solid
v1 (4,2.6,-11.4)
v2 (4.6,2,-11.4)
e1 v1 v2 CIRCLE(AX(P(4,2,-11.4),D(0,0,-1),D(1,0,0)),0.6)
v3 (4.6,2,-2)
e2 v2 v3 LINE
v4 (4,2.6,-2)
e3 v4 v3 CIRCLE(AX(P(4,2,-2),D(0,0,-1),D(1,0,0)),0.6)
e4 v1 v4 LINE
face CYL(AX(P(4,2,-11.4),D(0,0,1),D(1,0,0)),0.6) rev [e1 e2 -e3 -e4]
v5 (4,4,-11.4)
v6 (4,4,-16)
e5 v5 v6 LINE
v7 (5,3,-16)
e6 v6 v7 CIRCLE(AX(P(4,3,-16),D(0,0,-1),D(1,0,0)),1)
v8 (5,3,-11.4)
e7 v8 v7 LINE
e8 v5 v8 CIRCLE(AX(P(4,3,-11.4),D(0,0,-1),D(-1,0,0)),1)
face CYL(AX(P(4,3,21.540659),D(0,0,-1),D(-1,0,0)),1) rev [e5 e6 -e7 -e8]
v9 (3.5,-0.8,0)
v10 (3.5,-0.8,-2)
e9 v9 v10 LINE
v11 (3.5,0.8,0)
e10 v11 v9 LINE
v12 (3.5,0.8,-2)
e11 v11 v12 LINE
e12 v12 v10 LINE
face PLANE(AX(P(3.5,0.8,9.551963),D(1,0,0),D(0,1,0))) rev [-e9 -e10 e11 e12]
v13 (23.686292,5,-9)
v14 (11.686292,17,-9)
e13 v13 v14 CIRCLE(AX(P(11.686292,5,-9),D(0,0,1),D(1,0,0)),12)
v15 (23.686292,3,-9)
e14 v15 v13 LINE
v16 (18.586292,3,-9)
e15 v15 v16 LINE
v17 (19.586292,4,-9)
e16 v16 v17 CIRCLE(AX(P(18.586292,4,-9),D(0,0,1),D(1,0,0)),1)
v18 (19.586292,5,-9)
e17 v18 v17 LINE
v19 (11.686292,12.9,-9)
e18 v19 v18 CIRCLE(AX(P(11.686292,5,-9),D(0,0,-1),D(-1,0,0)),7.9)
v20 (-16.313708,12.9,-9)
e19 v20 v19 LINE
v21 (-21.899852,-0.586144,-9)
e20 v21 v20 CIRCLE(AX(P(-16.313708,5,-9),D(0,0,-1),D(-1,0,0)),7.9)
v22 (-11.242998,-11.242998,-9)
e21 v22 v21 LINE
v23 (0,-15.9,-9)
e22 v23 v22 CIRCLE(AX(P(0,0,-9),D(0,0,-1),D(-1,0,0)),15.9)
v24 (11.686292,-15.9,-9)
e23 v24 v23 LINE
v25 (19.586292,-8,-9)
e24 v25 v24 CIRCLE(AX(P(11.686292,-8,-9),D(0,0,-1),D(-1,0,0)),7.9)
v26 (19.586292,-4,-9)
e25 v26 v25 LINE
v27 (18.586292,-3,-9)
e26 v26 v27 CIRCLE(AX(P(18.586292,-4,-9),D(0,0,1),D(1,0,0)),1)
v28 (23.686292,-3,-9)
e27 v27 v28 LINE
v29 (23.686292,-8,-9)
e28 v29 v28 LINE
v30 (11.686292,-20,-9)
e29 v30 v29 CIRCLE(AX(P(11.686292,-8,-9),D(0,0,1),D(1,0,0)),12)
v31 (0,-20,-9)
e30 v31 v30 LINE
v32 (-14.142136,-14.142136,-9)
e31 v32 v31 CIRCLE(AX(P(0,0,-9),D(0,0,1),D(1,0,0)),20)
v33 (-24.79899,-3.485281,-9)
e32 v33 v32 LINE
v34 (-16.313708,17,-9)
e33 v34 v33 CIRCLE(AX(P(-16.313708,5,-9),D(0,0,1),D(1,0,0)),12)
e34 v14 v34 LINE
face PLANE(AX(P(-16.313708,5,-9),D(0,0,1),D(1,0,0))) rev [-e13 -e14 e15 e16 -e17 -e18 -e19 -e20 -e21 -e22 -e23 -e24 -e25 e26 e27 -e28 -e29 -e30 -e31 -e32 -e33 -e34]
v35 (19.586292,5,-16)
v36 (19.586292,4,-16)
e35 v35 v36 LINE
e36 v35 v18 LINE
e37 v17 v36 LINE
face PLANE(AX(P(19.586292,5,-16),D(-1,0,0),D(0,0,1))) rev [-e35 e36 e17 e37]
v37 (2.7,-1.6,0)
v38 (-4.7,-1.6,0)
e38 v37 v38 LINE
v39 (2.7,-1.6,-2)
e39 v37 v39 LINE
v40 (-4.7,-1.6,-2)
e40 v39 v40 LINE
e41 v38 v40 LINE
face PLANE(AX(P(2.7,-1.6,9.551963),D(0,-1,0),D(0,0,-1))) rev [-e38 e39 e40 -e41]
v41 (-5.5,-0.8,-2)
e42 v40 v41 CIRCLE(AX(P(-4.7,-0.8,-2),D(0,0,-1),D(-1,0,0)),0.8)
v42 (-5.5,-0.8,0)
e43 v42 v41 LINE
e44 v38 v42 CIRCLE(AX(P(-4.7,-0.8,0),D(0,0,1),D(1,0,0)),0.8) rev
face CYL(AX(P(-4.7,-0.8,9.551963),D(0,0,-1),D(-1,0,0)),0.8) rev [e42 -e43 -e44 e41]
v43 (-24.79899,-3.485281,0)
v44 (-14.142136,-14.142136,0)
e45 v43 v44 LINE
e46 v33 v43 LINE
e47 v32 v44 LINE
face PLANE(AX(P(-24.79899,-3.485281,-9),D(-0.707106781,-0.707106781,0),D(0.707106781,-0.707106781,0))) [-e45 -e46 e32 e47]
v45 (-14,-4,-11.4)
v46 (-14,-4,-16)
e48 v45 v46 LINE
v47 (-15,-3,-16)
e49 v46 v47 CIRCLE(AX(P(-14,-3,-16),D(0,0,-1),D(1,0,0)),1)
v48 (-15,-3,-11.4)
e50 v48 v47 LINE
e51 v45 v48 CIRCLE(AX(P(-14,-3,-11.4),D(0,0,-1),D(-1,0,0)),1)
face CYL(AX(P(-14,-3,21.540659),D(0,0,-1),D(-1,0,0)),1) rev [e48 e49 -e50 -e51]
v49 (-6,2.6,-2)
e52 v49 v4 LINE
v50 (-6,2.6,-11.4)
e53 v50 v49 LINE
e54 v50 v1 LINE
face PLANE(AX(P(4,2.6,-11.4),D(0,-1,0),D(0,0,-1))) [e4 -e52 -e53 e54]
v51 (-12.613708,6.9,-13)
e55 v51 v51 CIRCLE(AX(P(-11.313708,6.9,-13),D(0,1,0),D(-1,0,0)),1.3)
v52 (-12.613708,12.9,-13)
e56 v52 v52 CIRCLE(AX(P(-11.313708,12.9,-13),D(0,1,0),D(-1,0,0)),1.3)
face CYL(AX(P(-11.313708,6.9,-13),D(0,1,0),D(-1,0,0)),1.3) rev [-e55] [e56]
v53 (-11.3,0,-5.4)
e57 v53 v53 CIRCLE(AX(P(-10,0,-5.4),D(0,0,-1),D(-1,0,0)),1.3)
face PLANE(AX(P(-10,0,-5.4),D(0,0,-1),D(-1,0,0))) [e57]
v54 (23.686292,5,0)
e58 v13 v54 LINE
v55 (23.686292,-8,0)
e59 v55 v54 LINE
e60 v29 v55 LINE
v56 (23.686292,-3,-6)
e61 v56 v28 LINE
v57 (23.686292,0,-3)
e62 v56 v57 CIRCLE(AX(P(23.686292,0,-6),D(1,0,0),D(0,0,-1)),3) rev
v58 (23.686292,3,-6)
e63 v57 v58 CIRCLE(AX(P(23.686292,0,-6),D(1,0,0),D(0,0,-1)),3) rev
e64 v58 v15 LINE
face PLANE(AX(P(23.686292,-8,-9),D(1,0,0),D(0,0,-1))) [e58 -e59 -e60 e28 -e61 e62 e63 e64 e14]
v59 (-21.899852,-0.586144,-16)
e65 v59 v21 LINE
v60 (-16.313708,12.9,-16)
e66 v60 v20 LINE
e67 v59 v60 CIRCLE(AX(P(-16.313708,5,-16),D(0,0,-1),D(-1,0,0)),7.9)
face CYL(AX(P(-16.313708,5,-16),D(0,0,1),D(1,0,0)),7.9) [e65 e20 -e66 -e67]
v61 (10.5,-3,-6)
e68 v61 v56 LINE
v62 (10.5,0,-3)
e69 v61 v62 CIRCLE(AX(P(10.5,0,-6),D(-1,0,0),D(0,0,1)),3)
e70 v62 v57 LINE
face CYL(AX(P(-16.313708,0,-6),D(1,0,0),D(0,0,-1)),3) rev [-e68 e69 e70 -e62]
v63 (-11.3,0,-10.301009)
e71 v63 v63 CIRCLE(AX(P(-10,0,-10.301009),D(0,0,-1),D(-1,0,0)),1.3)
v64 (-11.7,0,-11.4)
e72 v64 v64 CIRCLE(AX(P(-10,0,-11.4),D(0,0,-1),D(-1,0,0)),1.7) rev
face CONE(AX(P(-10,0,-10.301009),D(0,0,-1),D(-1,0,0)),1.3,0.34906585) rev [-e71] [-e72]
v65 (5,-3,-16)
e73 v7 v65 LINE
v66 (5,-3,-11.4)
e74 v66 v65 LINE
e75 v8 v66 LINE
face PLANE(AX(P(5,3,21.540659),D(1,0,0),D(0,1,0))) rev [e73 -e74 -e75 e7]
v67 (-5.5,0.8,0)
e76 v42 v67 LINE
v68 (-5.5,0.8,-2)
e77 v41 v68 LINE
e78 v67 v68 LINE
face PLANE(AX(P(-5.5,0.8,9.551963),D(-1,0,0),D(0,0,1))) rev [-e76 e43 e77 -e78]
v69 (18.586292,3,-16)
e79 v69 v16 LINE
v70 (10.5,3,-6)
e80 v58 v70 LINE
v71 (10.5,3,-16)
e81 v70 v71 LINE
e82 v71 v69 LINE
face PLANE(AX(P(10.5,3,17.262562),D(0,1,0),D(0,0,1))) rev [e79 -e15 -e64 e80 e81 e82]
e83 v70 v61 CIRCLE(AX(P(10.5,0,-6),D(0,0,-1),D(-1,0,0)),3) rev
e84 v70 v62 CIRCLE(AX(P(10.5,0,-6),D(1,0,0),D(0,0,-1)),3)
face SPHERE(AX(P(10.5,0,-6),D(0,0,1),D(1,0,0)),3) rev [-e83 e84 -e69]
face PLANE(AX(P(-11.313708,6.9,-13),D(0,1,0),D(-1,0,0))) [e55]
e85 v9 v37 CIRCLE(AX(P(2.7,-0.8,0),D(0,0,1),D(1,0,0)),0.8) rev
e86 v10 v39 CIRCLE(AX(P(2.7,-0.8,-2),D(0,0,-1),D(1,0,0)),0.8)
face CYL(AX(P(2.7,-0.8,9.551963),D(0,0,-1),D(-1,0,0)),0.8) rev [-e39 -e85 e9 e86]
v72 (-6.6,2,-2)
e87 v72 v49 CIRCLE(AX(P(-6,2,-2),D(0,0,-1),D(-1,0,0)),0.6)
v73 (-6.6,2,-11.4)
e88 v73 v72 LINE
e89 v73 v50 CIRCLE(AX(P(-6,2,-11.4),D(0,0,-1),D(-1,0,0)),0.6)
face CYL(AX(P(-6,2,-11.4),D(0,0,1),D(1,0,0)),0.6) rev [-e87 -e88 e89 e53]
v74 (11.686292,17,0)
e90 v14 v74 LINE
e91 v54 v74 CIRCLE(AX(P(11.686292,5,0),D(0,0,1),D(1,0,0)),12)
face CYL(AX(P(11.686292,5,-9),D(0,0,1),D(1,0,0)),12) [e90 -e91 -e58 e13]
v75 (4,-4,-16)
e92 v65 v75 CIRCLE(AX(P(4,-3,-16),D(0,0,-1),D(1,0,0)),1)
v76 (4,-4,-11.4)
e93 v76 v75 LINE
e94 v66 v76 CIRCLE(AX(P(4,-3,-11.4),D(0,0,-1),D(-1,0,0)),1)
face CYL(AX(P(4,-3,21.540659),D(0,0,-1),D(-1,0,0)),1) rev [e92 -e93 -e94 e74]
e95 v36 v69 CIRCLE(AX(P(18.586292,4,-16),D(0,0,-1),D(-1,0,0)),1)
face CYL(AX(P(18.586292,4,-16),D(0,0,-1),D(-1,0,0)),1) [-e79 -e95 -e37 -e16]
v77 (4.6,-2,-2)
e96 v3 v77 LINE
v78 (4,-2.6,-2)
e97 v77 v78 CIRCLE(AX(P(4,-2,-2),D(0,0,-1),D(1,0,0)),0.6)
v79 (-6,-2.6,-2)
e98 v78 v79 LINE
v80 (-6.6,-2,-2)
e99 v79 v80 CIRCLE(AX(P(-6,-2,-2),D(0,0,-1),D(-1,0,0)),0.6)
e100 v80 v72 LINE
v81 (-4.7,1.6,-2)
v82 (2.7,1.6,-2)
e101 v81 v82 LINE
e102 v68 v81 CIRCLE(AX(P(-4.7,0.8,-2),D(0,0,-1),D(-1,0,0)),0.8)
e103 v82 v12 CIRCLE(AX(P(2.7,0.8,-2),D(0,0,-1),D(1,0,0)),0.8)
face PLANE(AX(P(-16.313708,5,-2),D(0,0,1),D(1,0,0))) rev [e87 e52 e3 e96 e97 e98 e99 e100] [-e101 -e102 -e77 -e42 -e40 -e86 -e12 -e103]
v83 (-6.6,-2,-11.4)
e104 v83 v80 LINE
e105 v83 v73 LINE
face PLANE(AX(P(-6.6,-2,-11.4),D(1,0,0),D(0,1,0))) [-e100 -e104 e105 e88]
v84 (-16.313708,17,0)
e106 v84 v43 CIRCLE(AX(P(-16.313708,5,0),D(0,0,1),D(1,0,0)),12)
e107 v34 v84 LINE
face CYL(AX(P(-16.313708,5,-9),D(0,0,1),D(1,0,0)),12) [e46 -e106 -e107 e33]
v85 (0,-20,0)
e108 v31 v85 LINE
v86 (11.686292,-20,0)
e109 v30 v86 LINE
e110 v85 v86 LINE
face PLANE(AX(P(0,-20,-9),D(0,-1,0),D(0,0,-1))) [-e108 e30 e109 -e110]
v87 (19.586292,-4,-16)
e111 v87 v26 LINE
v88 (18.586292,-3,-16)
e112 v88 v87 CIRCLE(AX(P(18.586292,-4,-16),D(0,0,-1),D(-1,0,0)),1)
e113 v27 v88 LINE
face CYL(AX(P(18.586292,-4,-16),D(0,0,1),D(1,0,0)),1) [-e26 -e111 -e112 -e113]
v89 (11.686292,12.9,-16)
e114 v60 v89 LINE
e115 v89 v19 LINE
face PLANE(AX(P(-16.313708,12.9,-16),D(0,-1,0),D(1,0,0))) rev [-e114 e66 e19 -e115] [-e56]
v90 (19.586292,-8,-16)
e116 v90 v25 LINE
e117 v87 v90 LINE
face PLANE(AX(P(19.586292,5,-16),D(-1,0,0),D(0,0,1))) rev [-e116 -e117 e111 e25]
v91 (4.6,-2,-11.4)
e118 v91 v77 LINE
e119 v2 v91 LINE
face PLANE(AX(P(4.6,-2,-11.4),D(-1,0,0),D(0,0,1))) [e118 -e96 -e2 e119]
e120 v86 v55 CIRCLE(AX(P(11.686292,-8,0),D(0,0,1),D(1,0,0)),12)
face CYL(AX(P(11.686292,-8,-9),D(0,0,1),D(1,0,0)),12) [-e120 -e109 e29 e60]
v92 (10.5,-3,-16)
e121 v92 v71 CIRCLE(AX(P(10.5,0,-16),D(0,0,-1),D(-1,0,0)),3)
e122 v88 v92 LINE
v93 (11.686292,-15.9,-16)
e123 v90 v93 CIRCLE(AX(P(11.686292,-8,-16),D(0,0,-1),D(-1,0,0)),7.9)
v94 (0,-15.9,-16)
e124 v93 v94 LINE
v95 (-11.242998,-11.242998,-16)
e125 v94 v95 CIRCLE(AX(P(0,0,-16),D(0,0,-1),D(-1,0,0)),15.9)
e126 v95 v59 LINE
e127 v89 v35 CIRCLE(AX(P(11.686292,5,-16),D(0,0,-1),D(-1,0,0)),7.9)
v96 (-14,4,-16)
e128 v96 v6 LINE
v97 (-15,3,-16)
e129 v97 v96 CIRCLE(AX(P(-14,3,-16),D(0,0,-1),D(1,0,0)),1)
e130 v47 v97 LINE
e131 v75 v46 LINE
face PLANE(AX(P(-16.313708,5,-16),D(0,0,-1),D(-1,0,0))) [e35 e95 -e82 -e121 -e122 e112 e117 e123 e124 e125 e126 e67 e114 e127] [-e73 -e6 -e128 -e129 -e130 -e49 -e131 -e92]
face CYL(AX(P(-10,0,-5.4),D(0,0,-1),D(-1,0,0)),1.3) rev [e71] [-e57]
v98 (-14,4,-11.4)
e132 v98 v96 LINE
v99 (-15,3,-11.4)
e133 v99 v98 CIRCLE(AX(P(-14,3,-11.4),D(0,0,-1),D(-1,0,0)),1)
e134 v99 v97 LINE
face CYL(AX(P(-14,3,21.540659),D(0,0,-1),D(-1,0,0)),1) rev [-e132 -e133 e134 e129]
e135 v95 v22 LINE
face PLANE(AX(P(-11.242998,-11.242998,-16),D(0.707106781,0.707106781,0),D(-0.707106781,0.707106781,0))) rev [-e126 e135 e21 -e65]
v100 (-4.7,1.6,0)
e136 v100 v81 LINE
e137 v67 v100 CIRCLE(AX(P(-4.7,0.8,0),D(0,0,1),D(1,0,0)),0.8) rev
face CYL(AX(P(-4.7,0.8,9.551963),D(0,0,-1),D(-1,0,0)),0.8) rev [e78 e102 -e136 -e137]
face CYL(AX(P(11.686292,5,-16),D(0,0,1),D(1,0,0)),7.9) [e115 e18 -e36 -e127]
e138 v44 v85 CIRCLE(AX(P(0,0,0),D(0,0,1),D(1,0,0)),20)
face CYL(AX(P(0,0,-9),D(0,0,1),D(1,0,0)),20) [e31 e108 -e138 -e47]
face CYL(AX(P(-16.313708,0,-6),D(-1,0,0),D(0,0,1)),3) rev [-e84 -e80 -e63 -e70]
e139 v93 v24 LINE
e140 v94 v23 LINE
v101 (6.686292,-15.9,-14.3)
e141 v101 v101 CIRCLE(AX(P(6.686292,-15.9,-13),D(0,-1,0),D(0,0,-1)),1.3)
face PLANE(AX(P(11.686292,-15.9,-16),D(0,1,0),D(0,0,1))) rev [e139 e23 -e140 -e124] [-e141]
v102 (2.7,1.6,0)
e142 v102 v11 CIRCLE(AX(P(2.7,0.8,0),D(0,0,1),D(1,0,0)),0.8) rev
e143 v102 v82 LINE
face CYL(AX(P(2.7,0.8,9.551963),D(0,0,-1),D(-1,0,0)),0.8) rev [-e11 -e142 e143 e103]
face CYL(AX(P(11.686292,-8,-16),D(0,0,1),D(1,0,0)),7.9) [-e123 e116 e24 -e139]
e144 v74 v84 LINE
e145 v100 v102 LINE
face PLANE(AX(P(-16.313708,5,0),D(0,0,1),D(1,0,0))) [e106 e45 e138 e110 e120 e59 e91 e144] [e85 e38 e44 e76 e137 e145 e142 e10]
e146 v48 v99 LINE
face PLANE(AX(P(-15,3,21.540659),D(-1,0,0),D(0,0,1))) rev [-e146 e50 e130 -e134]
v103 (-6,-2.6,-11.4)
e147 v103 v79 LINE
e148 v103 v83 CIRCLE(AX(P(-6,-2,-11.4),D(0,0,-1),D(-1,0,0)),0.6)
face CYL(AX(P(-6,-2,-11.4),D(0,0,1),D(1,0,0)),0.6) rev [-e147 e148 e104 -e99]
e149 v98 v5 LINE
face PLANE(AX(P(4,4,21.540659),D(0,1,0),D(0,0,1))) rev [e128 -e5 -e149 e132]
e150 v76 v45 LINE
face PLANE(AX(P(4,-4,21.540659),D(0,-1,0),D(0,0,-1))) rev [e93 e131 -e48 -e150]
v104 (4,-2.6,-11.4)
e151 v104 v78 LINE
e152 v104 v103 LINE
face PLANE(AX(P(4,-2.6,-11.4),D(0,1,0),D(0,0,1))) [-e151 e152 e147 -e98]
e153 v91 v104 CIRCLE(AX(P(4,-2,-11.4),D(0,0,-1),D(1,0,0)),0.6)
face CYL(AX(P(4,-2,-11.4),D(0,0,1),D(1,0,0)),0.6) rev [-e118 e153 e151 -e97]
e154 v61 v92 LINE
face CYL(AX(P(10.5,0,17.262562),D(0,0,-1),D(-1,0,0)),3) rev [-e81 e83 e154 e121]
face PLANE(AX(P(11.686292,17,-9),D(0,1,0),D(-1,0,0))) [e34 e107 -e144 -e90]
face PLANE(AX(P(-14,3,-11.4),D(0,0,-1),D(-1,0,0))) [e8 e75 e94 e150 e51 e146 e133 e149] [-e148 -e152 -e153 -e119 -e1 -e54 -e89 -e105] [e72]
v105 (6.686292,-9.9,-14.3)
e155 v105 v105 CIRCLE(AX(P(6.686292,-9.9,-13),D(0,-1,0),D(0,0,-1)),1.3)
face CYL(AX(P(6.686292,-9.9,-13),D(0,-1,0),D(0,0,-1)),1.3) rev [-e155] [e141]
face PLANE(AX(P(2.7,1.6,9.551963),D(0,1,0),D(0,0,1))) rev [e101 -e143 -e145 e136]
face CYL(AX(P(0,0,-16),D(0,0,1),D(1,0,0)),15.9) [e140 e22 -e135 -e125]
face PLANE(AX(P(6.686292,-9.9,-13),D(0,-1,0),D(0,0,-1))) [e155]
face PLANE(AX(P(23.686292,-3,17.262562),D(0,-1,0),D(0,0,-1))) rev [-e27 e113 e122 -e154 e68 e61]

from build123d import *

# Parameters (mm, degrees)
EXTRUDE_1_DEPTH     = 9
EXTRUDE_2_DEPTH     = 7
SKETCH_6_R          = 1.3
CUT_EXTRUDE_1_DEPTH = 6
SKETCH_7_R          = 1.3
CUT_EXTRUDE_2_DEPTH = 6
CUT_EXTRUDE_3_DEPTH = 14
CUT_EXTRUDE_4_DEPTH = 2
EXTRUDE_START       = 9.4
EXTRUDE_4_DEPTH     = 9.4
SKETCH_11_R         = 1.3
CUT_EXTRUDE_5_DEPTH = 6
CHAMFER_1_SIZE      = 0.4
CHAMFER_1_SIZE2     = 1.098990968
CUT_EXTRUDE_6_DEPTH = 13
FILLET_1_R          = 3
FILLET_2_R          = 1


with BuildPart() as part:
    # 草图2 → 凸台-拉伸1 (new body)
    with BuildSketch(Plane.XY):
        with BuildLine():
            Line((-24.798989873, -3.485281374), (-14.142135624, -14.142135624))
            ThreePointArc((-14.142135624, -14.142135624), (-7.653668647, -18.47759065), (0, -20))
            Line((0, -20), (11.686291501, -20))
            ThreePointArc((11.686291501, -20), (20.171572875, -16.485281374), (23.686291501, -8))
            Line((23.686291501, -8), (23.686291501, 5))
            ThreePointArc((23.686291501, 5), (20.171572875, 13.485281374), (11.686291501, 17))
            Line((11.686291501, 17), (-16.313708499, 17))
            ThreePointArc((-16.313708499, 17), (-27.400262889, 9.592201188), (-24.798989873, -3.485281374))
        make_face()
    extrude(amount=-EXTRUDE_1_DEPTH)

    # 草图3 → 凸台-拉伸2 (add)
    with BuildSketch(Plane(origin=(0, 0, -9), x_dir=(-1, 0, 0), z_dir=(0, 0, -1))):
        with BuildLine():
            Line((16.313708499, 12.9), (-11.686291501, 12.9))
            ThreePointArc((-11.686291501, 12.9), (-17.272435072, 10.586143571), (-19.586291501, 5))
            Line((-19.586291501, 5), (-19.586291501, -8))
            ThreePointArc((-19.586291501, -8), (-17.272435072, -13.586143571), (-11.686291501, -15.9))
            Line((-11.686291501, -15.9), (0, -15.9))
            ThreePointArc((0, -15.9), (6.084666575, -14.689684567), (11.242997821, -11.242997821))
            Line((11.242997821, -11.242997821), (21.89985207, -0.586143571))
            ThreePointArc((21.89985207, -0.586143571), (23.612356806, 8.023199116), (16.313708499, 12.9))
        make_face()
    extrude(amount=EXTRUDE_2_DEPTH)

    # 草图6 → 切除-拉伸1 (cut)
    with BuildSketch(Plane(origin=(0, 12.9, 0), x_dir=(1, 0, 0), z_dir=(0, 1, 0))):
        with Locations(Location((-11.313708499, 13, 0), (0, 0, 180))):
            Circle(SKETCH_6_R)
    extrude(amount=-CUT_EXTRUDE_1_DEPTH, mode=Mode.SUBTRACT)

    # 草图7 → 切除-拉伸2 (cut)
    with BuildSketch(Plane.XZ.offset(15.9)):
        with Locations(Location((6.686291501, -13, 0), (0, 0, 270))):
            Circle(SKETCH_7_R)
    extrude(amount=-CUT_EXTRUDE_2_DEPTH, mode=Mode.SUBTRACT)

    # 草图8 → 切除-拉伸3 (cut)
    with BuildSketch(Plane(origin=(0, 0, -16), x_dir=(-1, 0, 0), z_dir=(0, 0, -1))):
        with BuildLine():
            Line((-4, 4), (14, 4))
            ThreePointArc((14, 4), (14.707106781, 3.707106781), (15, 3))
            Line((15, 3), (15, -3))
            ThreePointArc((15, -3), (14.707106781, -3.707106781), (14, -4))
            Line((14, -4), (-4, -4))
            ThreePointArc((-4, -4), (-4.707106781, -3.707106781), (-5, -3))
            Line((-5, -3), (-5, 3))
            ThreePointArc((-5, 3), (-4.707106781, 3.707106781), (-4, 4))
        make_face()
    extrude(amount=-CUT_EXTRUDE_3_DEPTH, mode=Mode.SUBTRACT)

    # 草图9 → 切除-拉伸4 (cut)
    with BuildSketch(Plane(origin=(0, 0, -2), x_dir=(-1, 0, 0), z_dir=(0, 0, -1))):
        with BuildLine():
            Line((-2.7, 1.6), (4.7, 1.6))
            ThreePointArc((4.7, 1.6), (5.265685425, 1.365685425), (5.5, 0.8))
            Line((5.5, 0.8), (5.5, -0.8))
            ThreePointArc((5.5, -0.8), (5.265685425, -1.365685425), (4.7, -1.6))
            Line((4.7, -1.6), (-2.7, -1.6))
            ThreePointArc((-2.7, -1.6), (-3.265685425, -1.365685425), (-3.5, -0.8))
            Line((-3.5, -0.8), (-3.5, 0.8))
            ThreePointArc((-3.5, 0.8), (-3.265685425, 1.365685425), (-2.7, 1.6))
        make_face()
    extrude(amount=-CUT_EXTRUDE_4_DEPTH, mode=Mode.SUBTRACT)

    # 草图10 → 凸台-拉伸4 (add)
    with BuildSketch(Plane(origin=(0, 0, -2), x_dir=(-1, 0, 0), z_dir=(0, 0, -1)).offset(EXTRUDE_START)):
        with BuildLine():
            Line((14, 4), (-4, 4))
            ThreePointArc((-4, 4), (-4.707106781, 3.707106781), (-5, 3))
            Line((-5, 3), (-5, -3))
            ThreePointArc((-5, -3), (-4.707106781, -3.707106781), (-4, -4))
            Line((-4, -4), (14, -4))
            ThreePointArc((14, -4), (14.707106781, -3.707106781), (15, -3))
            Line((15, -3), (15, 3))
            ThreePointArc((15, 3), (14.707106781, 3.707106781), (14, 4))
        make_face()
        with BuildLine():
            Line((-4, -2.6), (6, -2.6))
            ThreePointArc((6, -2.6), (6.424264069, -2.424264069), (6.6, -2))
            Line((6.6, -2), (6.6, 2))
            ThreePointArc((6.6, 2), (6.424264069, 2.424264069), (6, 2.6))
            Line((6, 2.6), (-4, 2.6))
            ThreePointArc((-4, 2.6), (-4.424264069, 2.424264069), (-4.6, 2))
            Line((-4.6, 2), (-4.6, -2))
            ThreePointArc((-4.6, -2), (-4.424264069, -2.424264069), (-4, -2.6))
        make_face(mode=Mode.SUBTRACT)
    extrude(amount=-EXTRUDE_4_DEPTH)

    # 草图11 → 切除-拉伸5 (cut)
    with BuildSketch(Plane(origin=(0, 0, -11.4), x_dir=(-1, 0, 0), z_dir=(0, 0, -1))):
        with Locations((10, 0)):
            Circle(SKETCH_11_R)
    extrude(amount=-CUT_EXTRUDE_5_DEPTH, mode=Mode.SUBTRACT)

    # 倒角1
    chamfer_1_edges = [part.edges().sort_by_distance(p)[0] for p in [
        (-8.7, 0, -11.4),
    ]]
    chamfer_1_side = [part.faces().sort_by_distance(p)[0] for p in [
        (-7.139463972, 0, -11.4),
    ]]
    chamfer(chamfer_1_edges, length=CHAMFER_1_SIZE, length2=CHAMFER_1_SIZE2, reference=chamfer_1_side[0])

    # 草图14 → 切除-拉伸6 (cut)
    with BuildSketch(Plane(origin=(0, 0, -16), x_dir=(-1, 0, 0), z_dir=(0, 0, -1))):
        with BuildLine():
            Line((-10.5, 3), (-23.686291501, 3))
            Line((-23.686291501, 3), (-23.686291501, -3))
            Line((-23.686291501, -3), (-10.5, -3))
            ThreePointArc((-10.5, -3), (-7.5, 0), (-10.5, 3))
        make_face()
    extrude(amount=-CUT_EXTRUDE_6_DEPTH, mode=Mode.SUBTRACT)

    # 圆角1
    fillet_1_edges = [part.edges().sort_by_distance(p)[0] for p in [
        (17.093145751, -3, -3),
        (17.093145751, 3, -3),
        (7.5, 0, -3),
    ]]
    fillet(fillet_1_edges, radius=FILLET_1_R - 0.0001)  # a hair under: the kernel refuses the full size

    # 圆角2
    fillet_2_edges = [part.edges().sort_by_distance(p)[0] for p in [
        (19.586291501, 3, -12.5),
        (19.586291501, -3, -12.5),
    ]]
    fillet(fillet_2_edges, radius=FILLET_2_R)


solid = part.part
